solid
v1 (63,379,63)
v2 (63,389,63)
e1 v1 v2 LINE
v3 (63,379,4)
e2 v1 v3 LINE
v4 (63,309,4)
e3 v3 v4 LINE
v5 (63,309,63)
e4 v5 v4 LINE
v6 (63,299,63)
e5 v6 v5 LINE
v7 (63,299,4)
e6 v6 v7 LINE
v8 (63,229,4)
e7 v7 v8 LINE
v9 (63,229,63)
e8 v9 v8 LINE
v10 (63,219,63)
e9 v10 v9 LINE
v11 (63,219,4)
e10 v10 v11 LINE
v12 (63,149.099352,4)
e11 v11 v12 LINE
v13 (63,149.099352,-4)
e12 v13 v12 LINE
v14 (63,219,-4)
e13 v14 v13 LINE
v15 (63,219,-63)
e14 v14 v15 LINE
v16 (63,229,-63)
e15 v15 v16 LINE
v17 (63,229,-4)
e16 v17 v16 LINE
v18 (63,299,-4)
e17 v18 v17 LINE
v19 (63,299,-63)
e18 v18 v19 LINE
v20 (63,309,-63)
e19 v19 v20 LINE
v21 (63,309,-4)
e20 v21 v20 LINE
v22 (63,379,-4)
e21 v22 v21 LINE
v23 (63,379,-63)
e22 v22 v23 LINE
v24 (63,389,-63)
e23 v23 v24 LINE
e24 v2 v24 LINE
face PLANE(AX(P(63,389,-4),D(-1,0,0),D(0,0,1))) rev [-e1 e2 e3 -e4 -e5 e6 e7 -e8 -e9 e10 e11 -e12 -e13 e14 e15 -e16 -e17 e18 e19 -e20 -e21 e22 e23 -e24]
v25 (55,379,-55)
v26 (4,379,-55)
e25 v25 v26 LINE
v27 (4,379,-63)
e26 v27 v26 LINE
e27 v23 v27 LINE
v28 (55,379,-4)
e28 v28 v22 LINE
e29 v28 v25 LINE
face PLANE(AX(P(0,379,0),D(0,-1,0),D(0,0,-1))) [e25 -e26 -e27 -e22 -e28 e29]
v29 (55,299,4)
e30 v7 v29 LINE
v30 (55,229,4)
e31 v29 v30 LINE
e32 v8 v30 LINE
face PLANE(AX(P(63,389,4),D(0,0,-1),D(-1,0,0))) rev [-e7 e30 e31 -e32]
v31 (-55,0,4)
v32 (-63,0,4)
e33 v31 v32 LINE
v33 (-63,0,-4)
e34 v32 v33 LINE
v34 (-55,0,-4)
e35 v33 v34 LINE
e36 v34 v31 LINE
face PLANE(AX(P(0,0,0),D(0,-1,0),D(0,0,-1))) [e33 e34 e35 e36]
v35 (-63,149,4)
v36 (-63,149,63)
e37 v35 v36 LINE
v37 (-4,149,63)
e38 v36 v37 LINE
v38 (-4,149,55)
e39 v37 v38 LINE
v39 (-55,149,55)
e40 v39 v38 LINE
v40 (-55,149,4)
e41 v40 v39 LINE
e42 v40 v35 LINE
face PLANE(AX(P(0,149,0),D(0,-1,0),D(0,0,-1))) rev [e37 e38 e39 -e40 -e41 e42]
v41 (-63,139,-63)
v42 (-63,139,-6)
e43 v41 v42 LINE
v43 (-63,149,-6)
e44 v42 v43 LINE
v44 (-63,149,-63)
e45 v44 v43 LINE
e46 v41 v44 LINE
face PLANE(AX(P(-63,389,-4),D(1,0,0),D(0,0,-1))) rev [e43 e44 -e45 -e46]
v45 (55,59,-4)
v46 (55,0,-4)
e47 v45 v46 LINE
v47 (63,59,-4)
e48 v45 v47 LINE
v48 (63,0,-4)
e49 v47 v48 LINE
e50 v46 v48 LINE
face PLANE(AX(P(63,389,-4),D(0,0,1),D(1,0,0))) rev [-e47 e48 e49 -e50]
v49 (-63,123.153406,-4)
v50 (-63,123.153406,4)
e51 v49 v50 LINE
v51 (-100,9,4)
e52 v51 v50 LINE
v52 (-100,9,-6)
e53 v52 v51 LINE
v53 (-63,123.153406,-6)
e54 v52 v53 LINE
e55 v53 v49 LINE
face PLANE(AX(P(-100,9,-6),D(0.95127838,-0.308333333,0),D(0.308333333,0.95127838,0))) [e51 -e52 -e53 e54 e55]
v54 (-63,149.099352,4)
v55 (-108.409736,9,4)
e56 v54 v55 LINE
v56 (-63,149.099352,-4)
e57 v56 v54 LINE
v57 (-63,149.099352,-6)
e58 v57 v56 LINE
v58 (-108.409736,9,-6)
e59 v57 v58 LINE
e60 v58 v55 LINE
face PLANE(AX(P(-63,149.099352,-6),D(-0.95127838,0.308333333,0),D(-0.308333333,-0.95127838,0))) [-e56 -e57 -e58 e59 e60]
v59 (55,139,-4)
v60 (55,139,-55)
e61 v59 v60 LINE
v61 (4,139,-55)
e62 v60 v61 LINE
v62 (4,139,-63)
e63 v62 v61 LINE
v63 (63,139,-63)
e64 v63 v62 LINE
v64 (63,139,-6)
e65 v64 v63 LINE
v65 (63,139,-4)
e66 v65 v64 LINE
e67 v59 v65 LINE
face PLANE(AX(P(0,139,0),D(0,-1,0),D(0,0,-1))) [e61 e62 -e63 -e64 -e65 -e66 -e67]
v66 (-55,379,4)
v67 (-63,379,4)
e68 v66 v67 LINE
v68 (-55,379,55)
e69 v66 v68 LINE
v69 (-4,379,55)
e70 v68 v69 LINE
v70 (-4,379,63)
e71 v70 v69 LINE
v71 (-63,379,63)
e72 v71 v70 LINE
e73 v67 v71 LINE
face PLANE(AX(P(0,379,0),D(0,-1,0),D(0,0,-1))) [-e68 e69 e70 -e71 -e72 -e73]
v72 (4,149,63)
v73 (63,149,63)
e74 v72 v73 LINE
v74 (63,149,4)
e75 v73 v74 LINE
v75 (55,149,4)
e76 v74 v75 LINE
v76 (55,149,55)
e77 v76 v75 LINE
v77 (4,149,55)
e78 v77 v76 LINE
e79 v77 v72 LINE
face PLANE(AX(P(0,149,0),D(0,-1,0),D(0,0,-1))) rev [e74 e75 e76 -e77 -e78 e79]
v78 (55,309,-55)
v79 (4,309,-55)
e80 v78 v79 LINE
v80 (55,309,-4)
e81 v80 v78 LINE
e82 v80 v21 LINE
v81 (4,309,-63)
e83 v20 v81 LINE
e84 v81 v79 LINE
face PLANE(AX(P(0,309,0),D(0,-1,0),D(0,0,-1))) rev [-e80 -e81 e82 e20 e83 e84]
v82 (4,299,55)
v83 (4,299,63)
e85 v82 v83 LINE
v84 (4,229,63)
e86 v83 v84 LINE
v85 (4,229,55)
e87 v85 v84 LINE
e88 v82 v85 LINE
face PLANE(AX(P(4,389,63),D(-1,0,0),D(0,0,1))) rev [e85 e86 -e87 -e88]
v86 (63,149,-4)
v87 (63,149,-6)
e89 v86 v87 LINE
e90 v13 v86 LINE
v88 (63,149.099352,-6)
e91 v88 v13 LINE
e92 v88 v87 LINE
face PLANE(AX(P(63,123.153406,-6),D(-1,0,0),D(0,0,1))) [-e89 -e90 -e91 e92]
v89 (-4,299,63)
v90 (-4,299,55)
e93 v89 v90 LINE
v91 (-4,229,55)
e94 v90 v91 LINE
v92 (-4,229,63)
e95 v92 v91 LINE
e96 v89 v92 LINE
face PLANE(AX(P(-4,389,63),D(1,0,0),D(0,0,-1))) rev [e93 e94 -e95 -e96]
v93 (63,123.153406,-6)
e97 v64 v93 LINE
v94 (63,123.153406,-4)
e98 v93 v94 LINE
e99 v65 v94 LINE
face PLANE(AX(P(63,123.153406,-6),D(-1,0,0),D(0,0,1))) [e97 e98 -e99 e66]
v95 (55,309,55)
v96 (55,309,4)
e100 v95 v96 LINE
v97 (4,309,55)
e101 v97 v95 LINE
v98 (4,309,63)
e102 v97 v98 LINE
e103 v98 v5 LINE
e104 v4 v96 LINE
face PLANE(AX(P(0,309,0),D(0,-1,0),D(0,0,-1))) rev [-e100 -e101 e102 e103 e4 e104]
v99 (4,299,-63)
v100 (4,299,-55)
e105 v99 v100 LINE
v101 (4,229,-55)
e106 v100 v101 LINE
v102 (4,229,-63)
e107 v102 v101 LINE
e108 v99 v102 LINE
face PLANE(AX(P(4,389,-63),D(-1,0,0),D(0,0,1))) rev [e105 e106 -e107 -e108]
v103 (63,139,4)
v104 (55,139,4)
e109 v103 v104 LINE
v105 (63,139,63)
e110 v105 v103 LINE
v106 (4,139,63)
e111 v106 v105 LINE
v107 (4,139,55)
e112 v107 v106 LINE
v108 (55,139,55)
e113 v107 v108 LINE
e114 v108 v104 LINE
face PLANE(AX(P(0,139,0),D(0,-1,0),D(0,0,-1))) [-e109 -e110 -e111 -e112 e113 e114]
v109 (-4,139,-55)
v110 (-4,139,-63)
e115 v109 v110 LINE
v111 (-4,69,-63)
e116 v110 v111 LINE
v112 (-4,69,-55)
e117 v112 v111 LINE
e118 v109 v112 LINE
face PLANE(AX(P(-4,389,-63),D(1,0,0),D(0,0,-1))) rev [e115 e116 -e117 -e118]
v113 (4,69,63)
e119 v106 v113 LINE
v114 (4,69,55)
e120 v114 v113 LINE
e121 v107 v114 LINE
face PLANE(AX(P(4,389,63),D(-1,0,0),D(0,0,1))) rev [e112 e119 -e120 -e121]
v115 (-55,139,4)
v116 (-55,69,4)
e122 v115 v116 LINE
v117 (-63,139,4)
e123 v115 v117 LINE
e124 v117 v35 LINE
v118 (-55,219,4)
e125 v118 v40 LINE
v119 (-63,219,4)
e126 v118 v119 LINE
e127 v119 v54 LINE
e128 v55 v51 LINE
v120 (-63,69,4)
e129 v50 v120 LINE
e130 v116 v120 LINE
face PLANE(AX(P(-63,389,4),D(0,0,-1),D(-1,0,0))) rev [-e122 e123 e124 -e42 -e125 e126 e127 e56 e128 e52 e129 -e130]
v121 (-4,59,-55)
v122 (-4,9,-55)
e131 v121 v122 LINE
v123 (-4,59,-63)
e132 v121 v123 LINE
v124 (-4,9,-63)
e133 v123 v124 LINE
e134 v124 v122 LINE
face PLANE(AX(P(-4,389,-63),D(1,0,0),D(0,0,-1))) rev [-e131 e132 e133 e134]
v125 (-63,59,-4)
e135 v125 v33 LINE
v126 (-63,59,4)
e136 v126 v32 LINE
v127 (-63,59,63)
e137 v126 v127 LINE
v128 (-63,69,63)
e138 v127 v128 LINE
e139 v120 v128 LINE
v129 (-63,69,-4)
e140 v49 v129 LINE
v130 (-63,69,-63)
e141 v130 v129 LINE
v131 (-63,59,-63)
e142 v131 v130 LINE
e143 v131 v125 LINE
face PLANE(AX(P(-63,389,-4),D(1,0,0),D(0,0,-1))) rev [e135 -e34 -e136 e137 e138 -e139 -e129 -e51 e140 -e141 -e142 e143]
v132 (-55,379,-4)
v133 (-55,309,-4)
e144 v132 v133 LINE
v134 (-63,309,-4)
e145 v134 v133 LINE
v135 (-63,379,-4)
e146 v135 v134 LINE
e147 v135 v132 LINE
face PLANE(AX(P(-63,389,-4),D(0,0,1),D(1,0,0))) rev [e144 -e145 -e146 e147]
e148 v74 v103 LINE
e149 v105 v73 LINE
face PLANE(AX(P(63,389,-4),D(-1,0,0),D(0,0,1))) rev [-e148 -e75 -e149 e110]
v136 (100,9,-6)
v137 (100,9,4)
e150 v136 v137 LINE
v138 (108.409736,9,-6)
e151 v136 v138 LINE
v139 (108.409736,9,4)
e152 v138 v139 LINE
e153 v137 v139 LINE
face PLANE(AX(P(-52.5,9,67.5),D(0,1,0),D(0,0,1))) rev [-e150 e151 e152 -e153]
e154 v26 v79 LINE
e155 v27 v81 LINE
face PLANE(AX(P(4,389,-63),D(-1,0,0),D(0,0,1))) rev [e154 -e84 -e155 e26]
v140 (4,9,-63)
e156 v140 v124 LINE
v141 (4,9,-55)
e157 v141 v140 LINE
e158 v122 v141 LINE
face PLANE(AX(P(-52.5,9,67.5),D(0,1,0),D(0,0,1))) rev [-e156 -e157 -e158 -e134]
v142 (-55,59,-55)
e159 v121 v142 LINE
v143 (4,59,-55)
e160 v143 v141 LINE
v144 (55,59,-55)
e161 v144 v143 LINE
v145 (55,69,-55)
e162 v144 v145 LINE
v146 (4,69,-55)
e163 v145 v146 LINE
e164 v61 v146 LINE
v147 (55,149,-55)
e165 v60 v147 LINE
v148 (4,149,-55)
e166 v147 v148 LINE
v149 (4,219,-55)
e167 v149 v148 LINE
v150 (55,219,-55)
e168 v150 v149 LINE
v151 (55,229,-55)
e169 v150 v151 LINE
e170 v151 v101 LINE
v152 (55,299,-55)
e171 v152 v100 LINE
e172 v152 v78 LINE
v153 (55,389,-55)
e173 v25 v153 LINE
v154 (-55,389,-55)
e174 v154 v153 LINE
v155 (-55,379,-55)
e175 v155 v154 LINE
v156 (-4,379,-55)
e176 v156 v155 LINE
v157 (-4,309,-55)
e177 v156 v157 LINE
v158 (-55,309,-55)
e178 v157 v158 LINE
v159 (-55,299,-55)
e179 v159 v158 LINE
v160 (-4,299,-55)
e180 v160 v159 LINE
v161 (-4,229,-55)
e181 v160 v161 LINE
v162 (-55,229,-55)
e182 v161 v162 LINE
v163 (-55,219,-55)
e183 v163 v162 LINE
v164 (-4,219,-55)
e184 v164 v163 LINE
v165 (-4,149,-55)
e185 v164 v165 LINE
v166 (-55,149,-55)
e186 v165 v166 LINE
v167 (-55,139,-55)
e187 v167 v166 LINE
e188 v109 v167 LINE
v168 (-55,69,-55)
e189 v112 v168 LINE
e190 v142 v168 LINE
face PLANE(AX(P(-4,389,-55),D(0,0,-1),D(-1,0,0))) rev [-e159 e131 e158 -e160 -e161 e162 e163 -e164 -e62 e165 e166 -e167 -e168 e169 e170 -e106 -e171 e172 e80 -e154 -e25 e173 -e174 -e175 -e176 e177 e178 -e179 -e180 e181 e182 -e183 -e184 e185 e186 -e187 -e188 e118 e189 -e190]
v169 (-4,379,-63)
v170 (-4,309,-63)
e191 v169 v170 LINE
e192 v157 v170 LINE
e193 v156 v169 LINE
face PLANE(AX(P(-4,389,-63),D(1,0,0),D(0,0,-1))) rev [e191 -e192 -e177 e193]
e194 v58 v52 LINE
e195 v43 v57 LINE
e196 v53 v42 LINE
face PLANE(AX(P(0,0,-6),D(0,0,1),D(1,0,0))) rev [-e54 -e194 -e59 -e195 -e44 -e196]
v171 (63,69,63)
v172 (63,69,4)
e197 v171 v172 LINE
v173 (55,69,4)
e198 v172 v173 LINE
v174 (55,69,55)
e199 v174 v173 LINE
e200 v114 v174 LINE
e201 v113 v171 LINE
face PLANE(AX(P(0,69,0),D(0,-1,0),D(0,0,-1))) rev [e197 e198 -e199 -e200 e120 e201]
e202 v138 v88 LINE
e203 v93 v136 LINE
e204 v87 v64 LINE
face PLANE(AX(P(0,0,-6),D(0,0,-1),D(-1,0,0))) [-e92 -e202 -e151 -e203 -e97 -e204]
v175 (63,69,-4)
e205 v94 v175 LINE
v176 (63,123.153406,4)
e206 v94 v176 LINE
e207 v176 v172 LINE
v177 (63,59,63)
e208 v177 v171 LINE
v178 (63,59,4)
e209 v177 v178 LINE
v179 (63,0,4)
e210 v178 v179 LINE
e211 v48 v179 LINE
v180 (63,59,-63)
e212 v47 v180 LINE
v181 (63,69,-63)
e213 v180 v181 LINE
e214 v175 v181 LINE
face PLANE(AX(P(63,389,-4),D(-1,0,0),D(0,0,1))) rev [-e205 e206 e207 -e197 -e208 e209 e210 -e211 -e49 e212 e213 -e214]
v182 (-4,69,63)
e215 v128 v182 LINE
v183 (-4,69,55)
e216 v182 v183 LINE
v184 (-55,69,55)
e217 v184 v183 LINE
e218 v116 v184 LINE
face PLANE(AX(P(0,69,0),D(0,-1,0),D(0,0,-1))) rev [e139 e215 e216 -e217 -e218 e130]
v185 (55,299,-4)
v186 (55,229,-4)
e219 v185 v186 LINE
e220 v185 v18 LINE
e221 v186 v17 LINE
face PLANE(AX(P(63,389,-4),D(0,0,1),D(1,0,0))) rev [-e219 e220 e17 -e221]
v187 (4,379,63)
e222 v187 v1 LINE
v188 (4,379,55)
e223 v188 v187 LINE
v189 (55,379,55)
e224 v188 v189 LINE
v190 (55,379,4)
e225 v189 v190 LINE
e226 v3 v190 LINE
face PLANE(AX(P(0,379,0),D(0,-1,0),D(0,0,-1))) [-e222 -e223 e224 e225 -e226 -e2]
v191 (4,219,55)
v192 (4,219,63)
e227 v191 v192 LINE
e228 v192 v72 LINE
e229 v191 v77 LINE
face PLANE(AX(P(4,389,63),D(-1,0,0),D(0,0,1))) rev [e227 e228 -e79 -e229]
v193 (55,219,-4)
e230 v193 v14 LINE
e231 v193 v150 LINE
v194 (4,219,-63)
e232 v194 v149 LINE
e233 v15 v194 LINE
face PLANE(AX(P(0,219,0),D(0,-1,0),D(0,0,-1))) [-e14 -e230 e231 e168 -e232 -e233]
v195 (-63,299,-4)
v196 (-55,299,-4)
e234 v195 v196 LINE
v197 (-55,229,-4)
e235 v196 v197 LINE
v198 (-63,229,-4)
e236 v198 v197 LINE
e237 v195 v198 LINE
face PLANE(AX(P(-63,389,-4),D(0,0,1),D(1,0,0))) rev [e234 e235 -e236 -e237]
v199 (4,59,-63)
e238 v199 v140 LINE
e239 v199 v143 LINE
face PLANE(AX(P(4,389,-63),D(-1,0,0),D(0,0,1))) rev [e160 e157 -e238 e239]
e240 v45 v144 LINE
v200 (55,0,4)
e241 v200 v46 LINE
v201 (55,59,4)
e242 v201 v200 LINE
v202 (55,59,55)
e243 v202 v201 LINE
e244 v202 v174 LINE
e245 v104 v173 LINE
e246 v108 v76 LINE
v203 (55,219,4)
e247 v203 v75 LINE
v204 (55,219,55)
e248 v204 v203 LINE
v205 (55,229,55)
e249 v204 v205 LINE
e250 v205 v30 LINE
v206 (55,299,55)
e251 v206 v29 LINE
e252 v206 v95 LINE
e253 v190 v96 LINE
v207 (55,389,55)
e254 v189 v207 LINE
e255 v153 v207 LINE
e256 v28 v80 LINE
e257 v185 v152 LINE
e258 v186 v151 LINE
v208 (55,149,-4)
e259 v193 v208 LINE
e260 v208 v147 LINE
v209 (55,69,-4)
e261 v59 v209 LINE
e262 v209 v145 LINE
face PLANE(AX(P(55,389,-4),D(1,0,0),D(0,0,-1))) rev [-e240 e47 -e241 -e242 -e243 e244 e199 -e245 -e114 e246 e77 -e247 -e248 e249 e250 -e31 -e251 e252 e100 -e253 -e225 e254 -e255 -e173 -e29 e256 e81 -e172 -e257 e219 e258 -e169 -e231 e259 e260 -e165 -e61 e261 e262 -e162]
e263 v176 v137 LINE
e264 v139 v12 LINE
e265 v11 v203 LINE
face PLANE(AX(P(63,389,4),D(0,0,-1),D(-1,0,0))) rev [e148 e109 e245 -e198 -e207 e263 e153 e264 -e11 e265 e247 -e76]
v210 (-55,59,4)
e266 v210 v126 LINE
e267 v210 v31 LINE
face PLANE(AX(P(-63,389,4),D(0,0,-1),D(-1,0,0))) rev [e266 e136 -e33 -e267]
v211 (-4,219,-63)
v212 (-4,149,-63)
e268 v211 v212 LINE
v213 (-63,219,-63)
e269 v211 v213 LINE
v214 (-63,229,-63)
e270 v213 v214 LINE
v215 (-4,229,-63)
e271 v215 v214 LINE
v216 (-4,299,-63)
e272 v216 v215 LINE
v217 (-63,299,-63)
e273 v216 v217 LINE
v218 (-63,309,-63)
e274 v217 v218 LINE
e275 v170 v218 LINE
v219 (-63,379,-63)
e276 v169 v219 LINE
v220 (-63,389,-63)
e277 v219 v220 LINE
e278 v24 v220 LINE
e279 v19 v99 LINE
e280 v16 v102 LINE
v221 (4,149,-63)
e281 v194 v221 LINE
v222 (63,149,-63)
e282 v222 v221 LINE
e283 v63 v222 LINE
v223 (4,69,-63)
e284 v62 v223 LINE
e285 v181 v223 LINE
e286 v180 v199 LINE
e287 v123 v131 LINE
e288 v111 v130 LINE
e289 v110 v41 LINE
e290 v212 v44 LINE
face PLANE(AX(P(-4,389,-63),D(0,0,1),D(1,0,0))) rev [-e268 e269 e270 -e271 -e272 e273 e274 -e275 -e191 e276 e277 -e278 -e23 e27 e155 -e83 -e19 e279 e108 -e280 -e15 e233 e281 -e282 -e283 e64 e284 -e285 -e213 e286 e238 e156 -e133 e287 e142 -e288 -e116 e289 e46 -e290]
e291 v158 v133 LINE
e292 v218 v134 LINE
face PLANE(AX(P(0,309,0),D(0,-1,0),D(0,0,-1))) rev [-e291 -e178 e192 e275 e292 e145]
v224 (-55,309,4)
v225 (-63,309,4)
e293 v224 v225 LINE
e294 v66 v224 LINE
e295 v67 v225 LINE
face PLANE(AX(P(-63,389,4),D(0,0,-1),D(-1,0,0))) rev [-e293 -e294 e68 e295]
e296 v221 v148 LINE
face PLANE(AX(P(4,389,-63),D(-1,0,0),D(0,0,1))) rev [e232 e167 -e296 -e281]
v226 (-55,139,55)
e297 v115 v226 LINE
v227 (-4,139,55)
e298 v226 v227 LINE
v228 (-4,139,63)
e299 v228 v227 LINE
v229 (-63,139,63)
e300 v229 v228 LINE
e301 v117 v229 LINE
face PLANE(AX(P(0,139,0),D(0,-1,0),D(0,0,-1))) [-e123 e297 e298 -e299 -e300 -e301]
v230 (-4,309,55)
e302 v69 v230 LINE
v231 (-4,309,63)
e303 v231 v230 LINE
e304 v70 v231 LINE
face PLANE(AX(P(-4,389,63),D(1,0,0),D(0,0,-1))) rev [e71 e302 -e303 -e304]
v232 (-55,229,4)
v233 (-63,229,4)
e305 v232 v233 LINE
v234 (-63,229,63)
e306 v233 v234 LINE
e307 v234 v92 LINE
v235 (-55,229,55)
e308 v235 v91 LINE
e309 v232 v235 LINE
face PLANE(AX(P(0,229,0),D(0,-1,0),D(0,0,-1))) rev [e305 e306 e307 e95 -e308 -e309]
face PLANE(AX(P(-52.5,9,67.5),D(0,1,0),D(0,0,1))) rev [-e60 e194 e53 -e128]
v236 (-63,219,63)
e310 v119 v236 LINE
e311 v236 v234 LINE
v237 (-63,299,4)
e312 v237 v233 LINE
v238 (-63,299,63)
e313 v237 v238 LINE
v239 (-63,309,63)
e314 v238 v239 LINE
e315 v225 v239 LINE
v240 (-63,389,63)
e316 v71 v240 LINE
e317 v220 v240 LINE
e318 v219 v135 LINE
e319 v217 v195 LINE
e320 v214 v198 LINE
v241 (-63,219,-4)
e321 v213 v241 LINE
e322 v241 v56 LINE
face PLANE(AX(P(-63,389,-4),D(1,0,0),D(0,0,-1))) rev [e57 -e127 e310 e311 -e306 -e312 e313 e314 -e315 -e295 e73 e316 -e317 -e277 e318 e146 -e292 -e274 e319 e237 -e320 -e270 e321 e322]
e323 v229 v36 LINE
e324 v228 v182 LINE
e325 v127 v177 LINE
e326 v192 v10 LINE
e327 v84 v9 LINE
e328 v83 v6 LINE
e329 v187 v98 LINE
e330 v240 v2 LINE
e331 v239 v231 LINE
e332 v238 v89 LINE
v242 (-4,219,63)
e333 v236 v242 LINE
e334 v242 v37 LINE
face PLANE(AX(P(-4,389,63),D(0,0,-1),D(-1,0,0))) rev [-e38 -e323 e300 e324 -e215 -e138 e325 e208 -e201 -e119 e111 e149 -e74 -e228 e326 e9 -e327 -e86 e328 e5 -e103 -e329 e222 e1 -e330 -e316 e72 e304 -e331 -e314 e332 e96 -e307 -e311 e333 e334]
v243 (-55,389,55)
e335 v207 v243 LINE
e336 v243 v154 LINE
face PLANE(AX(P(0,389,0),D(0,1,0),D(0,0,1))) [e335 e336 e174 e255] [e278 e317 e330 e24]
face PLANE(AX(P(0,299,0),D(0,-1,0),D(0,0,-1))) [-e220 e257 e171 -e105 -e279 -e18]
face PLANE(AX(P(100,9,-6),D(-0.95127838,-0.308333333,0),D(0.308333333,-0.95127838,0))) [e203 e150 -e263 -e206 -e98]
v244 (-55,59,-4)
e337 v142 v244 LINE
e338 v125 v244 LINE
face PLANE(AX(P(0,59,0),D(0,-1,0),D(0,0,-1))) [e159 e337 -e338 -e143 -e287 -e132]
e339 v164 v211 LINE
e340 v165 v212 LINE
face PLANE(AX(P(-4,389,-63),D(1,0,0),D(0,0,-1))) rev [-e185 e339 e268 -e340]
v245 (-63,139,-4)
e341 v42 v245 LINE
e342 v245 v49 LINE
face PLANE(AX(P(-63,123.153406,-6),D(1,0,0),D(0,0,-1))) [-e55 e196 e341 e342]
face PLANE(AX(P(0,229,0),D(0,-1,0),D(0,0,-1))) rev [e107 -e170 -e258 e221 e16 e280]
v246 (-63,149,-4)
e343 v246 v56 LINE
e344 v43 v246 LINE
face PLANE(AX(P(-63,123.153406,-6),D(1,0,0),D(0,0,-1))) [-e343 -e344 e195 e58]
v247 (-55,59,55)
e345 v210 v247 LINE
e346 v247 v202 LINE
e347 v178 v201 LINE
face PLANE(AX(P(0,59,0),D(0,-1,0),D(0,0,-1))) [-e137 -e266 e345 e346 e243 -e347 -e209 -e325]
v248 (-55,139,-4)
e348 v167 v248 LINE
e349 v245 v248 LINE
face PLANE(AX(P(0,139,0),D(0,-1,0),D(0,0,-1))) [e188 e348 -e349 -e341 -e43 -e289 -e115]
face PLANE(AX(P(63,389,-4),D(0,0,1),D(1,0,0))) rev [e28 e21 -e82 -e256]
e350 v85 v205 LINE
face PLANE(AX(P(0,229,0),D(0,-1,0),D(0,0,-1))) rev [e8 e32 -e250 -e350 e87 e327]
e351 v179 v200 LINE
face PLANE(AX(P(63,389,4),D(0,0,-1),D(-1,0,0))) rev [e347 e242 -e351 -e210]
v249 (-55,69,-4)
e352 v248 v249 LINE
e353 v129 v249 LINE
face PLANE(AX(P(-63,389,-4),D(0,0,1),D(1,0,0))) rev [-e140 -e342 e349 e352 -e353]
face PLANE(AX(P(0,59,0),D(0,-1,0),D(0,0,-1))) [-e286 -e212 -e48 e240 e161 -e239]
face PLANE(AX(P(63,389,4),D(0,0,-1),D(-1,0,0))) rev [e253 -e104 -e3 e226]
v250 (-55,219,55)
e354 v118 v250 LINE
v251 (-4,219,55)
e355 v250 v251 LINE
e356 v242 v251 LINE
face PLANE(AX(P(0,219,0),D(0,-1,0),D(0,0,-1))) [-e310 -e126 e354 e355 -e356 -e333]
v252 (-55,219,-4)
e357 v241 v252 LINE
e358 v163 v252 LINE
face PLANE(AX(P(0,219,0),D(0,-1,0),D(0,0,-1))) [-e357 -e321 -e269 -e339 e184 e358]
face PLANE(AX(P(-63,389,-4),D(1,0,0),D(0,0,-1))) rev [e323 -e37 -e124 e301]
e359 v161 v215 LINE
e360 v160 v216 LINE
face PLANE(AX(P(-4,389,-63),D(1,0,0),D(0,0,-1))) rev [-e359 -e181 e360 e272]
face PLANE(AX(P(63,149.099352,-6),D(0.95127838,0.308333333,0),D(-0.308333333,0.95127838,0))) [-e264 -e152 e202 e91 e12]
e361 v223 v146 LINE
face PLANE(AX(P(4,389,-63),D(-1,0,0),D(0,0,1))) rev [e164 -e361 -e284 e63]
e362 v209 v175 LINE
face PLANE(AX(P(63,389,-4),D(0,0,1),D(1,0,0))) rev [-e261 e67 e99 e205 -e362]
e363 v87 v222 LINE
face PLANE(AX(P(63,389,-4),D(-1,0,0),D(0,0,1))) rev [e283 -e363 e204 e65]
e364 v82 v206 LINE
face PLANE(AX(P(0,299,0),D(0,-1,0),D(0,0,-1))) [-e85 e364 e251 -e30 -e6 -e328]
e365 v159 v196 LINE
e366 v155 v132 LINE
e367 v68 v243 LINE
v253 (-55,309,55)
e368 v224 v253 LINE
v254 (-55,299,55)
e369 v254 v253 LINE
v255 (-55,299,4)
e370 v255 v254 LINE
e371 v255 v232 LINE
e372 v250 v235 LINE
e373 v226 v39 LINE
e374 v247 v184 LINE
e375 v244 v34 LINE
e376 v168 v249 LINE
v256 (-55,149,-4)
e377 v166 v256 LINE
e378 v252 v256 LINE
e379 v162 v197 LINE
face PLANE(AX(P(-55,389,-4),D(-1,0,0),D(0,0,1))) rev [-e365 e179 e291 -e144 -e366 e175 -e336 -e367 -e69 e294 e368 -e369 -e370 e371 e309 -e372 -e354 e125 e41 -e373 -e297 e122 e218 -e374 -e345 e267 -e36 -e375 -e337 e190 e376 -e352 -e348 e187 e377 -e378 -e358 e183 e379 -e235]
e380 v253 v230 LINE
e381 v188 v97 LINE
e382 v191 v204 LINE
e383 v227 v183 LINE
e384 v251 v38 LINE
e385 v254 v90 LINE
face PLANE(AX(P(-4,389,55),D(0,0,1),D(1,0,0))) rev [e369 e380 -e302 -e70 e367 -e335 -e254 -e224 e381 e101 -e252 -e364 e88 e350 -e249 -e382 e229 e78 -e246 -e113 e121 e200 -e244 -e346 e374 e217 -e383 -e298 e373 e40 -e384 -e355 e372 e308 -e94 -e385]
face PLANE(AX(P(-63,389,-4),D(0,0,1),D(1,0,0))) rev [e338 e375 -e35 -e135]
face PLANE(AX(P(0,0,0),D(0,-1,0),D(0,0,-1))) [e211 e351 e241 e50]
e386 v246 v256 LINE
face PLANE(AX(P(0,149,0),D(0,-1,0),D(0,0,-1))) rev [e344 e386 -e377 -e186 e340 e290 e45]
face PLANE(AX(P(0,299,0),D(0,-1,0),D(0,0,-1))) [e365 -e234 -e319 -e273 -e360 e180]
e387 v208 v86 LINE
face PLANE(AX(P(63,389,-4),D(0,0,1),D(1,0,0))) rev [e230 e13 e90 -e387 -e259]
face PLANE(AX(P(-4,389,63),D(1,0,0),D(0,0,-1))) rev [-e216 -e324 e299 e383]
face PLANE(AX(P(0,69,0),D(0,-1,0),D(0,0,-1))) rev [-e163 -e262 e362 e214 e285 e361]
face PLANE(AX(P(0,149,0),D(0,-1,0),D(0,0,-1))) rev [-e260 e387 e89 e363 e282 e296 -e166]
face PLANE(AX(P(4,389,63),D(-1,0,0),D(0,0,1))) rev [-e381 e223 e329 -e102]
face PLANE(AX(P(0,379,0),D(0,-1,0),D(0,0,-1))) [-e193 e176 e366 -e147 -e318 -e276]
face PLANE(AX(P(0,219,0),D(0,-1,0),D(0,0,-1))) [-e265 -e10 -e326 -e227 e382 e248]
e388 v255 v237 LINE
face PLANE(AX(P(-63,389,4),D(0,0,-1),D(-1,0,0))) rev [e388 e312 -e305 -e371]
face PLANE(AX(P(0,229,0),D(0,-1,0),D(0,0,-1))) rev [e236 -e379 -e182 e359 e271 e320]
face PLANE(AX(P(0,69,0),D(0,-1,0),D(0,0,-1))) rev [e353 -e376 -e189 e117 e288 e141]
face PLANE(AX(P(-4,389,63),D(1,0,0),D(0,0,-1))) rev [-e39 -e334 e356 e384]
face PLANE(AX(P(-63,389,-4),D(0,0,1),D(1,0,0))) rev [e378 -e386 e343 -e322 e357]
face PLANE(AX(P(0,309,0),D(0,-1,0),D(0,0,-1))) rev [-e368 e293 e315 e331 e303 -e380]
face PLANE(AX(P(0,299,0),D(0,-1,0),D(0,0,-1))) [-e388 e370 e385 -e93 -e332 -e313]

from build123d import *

# Parameters (mm, degrees)
SKETCH_1_W               = 105
SKETCH_1_H               = 105
EXTRUDE_1_DEPTH          = 9
SKETCH_2_R               = 5.5
CUT_EXTRUDE_1_DEPTH      = 9
SKETCH_4_W               = 10
SKETCH_4_H               = 10
EXTRUDE_2_DEPTH          = 30
SKETCH_5_R               = 12.5
EXTRUDE_3_DEPTH          = 10
SKETCH_6_W               = 8
SKETCH_6_H               = 8
EXTRUDE_4_DEPTH          = 380
EXTRUDE_5_DEPTH          = 10
PATTERN_LINEAR_1_COUNT   = 5
PATTERN_LINEAR_1_PITCH   = 80
EXTRUDE_6_DEPTH          = 10
SKETCH_9_W               = 105
SKETCH_9_H               = 15
CUT_EXTRUDE_2_DEPTH      = 59
SPLIT_START              = -31.043560763
SPLIT_BODIES_2_OUTLINE_R = 5.5
SPLIT_BODIES_2_DEPTH     = 40.043560763
SKETCH_10_W              = 8
SKETCH_10_H              = 8
EXTRUDE_8_DEPTH          = 9


# Read off the part's stored shape, not the designer's step: 分割2
with BuildPart() as part:
    # 草图1 → 凸台-拉伸1 (new body)
    with BuildSketch(Plane(origin=(0, 0, 0), x_dir=(1, 0, 0), z_dir=(0, 1, 0))):
        with BuildLine():
            Line((-102.5, 102.5), (102.5, 102.5))
            Line((102.5, 102.5), (146.930137945, 8.550357413))
            ThreePointArc((146.930137945, 8.550357413), (148.85, 0), (146.930137945, -8.550357413))
            Line((146.930137945, -8.550357413), (90, -67.5))
            Line((90, -67.5), (52.5, -67.5))
            Line((52.5, -67.5), (-52.5, -67.5))
            Line((-52.5, -67.5), (-90, -67.5))
            Line((-90, -67.5), (-146.930137945, -8.550357413))
            ThreePointArc((-146.930137945, -8.550357413), (-148.85, 0), (-146.930137945, 8.550357413))
            Line((-146.930137945, 8.550357413), (-102.5, 102.5))
        make_face()
        Rectangle(SKETCH_1_W, SKETCH_1_H, mode=Mode.SUBTRACT)
    extrude(amount=EXTRUDE_1_DEPTH)

    # 草图2 → 切除-拉伸1 (cut)
    with BuildSketch(Plane(origin=(0, 9, 0), x_dir=(1, 0, 0), z_dir=(0, 1, 0))):
        with Locations(Location((-128.85, 0, 0), (0, 0, 270))):
            Circle(SKETCH_2_R)
        with Locations(Location((128.85, 0, 0), (0, 0, 270))):
            Circle(SKETCH_2_R)
    extrude(amount=-CUT_EXTRUDE_1_DEPTH, mode=Mode.SUBTRACT)

    # 草图4 → 凸台-拉伸2 (add)
    with BuildSketch(Plane.XZ):
        with Locations((-92, 0)):
            Rectangle(SKETCH_4_W, SKETCH_4_H)
        with Locations((92, 0)):
            Rectangle(SKETCH_4_W, SKETCH_4_H)
    extrude(amount=EXTRUDE_2_DEPTH)

    # 草图5 → 凸台-拉伸3 (add)
    with BuildSketch(Plane.ZY.offset(-87)):
        with Locations((0, -18.543560763)):
            Circle(SKETCH_5_R)
    extrude_3 = extrude(amount=-EXTRUDE_3_DEPTH)

    # 镜向1: 凸台-拉伸3 across plane
    add(extrude_3.mirror(Plane(origin=(0, 0, 0), x_dir=(0, 0, 1), z_dir=(1, 0, 0))))

    # 草图6 → 凸台-拉伸4 (add)
    with BuildSketch(Plane(origin=(0, 9, 0), x_dir=(1, 0, 0), z_dir=(0, 1, 0))):
        with Locations((-59, 0)):
            Rectangle(SKETCH_6_W, SKETCH_6_H)
        with Locations((59, 0)):
            Rectangle(SKETCH_6_W, SKETCH_6_H)
        with Locations((0, 59)):
            Rectangle(SKETCH_6_W, SKETCH_6_H)
        with Locations((0, -59)):
            Rectangle(SKETCH_6_W, SKETCH_6_H)
    extrude(amount=EXTRUDE_4_DEPTH)

    # 草图7 → 凸台-拉伸5 (add)
    with BuildSketch(Plane(origin=(0, 389, 0), x_dir=(1, 0, 0), z_dir=(0, 1, 0))):
        Polygon((-63, 4), (-63, 63), (63, 63), (63, -63), (-63, -63), align=None)
        Polygon((-55, 4), (-55, 55), (55, 55), (55, -55), (-55, -55), align=None, mode=Mode.SUBTRACT)
    extrude_5 = extrude(amount=-EXTRUDE_5_DEPTH)

    # 阵列(线性)1: 凸台-拉伸5 ×5
    with Locations(*[(0, -i * PATTERN_LINEAR_1_PITCH, 0) for i in range(1, PATTERN_LINEAR_1_COUNT)]):
        add(extrude_5)

    # 草图8 → 凸台-拉伸6 (add)
    with BuildSketch(Plane.XY.offset(4)):
        Polygon((-100, 9), (-63, 123.153405556), (-63, 149.099351502), (-108.409735963, 9), align=None)
        Polygon((108.409735963, 9), (100, 9), (63, 123.153405556), (63, 149.099351502), align=None)
    extrude(amount=-EXTRUDE_6_DEPTH)

    # 草图9 → 切除-拉伸2 (cut)
    with BuildSketch(Plane.XZ):
        with Locations((0, 60)):
            Rectangle(SKETCH_9_W, SKETCH_9_H)
    extrude(amount=-CUT_EXTRUDE_2_DEPTH, mode=Mode.SUBTRACT)

    # Split Bodies 2 outline → Split Bodies 2 (cut)
    with BuildSketch(Plane(origin=(0, 0, 0), x_dir=(1, 0, 0), z_dir=(0, 1, 0)).offset(SPLIT_START)):
        with BuildLine():
            Line((-90, -67.5), (-52.5, -67.5))
            Line((-52.5, -67.5), (-52.5, 52.5))
            Line((-52.5, 52.5), (52.5, 52.5))
            Line((52.5, 52.5), (52.5, -67.5))
            Line((52.5, -67.5), (90, -67.5))
            Line((90, -67.5), (146.930137945, -8.550357413))
            ThreePointArc((146.930137945, -8.550357413), (148.85, 0), (146.930137945, 8.550357413))
            Line((146.930137945, 8.550357413), (102.5, 102.5))
            Line((102.5, 102.5), (-102.5, 102.5))
            Line((-102.5, 102.5), (-146.930137945, 8.550357413))
            ThreePointArc((-146.930137945, 8.550357413), (-148.85, 0), (-146.930137945, -8.550357413))
            Line((-146.930137945, -8.550357413), (-90, -67.5))
        make_face()
        with Locations((-128.85, 0)):
            Circle(SPLIT_BODIES_2_OUTLINE_R, mode=Mode.SUBTRACT)
        with Locations((128.85, 0)):
            Circle(SPLIT_BODIES_2_OUTLINE_R, mode=Mode.SUBTRACT)
    extrude(amount=SPLIT_BODIES_2_DEPTH, mode=Mode.SUBTRACT)

    # 草图10 → 凸台-拉伸8 (add)
    with BuildSketch(Plane.XZ.offset(-9)):
        with Locations((-59, 0)):
            Rectangle(SKETCH_10_W, SKETCH_10_H)
        with Locations((59, 0)):
            Rectangle(SKETCH_10_W, SKETCH_10_H)
    extrude(amount=EXTRUDE_8_DEPTH)


solid = part.part
